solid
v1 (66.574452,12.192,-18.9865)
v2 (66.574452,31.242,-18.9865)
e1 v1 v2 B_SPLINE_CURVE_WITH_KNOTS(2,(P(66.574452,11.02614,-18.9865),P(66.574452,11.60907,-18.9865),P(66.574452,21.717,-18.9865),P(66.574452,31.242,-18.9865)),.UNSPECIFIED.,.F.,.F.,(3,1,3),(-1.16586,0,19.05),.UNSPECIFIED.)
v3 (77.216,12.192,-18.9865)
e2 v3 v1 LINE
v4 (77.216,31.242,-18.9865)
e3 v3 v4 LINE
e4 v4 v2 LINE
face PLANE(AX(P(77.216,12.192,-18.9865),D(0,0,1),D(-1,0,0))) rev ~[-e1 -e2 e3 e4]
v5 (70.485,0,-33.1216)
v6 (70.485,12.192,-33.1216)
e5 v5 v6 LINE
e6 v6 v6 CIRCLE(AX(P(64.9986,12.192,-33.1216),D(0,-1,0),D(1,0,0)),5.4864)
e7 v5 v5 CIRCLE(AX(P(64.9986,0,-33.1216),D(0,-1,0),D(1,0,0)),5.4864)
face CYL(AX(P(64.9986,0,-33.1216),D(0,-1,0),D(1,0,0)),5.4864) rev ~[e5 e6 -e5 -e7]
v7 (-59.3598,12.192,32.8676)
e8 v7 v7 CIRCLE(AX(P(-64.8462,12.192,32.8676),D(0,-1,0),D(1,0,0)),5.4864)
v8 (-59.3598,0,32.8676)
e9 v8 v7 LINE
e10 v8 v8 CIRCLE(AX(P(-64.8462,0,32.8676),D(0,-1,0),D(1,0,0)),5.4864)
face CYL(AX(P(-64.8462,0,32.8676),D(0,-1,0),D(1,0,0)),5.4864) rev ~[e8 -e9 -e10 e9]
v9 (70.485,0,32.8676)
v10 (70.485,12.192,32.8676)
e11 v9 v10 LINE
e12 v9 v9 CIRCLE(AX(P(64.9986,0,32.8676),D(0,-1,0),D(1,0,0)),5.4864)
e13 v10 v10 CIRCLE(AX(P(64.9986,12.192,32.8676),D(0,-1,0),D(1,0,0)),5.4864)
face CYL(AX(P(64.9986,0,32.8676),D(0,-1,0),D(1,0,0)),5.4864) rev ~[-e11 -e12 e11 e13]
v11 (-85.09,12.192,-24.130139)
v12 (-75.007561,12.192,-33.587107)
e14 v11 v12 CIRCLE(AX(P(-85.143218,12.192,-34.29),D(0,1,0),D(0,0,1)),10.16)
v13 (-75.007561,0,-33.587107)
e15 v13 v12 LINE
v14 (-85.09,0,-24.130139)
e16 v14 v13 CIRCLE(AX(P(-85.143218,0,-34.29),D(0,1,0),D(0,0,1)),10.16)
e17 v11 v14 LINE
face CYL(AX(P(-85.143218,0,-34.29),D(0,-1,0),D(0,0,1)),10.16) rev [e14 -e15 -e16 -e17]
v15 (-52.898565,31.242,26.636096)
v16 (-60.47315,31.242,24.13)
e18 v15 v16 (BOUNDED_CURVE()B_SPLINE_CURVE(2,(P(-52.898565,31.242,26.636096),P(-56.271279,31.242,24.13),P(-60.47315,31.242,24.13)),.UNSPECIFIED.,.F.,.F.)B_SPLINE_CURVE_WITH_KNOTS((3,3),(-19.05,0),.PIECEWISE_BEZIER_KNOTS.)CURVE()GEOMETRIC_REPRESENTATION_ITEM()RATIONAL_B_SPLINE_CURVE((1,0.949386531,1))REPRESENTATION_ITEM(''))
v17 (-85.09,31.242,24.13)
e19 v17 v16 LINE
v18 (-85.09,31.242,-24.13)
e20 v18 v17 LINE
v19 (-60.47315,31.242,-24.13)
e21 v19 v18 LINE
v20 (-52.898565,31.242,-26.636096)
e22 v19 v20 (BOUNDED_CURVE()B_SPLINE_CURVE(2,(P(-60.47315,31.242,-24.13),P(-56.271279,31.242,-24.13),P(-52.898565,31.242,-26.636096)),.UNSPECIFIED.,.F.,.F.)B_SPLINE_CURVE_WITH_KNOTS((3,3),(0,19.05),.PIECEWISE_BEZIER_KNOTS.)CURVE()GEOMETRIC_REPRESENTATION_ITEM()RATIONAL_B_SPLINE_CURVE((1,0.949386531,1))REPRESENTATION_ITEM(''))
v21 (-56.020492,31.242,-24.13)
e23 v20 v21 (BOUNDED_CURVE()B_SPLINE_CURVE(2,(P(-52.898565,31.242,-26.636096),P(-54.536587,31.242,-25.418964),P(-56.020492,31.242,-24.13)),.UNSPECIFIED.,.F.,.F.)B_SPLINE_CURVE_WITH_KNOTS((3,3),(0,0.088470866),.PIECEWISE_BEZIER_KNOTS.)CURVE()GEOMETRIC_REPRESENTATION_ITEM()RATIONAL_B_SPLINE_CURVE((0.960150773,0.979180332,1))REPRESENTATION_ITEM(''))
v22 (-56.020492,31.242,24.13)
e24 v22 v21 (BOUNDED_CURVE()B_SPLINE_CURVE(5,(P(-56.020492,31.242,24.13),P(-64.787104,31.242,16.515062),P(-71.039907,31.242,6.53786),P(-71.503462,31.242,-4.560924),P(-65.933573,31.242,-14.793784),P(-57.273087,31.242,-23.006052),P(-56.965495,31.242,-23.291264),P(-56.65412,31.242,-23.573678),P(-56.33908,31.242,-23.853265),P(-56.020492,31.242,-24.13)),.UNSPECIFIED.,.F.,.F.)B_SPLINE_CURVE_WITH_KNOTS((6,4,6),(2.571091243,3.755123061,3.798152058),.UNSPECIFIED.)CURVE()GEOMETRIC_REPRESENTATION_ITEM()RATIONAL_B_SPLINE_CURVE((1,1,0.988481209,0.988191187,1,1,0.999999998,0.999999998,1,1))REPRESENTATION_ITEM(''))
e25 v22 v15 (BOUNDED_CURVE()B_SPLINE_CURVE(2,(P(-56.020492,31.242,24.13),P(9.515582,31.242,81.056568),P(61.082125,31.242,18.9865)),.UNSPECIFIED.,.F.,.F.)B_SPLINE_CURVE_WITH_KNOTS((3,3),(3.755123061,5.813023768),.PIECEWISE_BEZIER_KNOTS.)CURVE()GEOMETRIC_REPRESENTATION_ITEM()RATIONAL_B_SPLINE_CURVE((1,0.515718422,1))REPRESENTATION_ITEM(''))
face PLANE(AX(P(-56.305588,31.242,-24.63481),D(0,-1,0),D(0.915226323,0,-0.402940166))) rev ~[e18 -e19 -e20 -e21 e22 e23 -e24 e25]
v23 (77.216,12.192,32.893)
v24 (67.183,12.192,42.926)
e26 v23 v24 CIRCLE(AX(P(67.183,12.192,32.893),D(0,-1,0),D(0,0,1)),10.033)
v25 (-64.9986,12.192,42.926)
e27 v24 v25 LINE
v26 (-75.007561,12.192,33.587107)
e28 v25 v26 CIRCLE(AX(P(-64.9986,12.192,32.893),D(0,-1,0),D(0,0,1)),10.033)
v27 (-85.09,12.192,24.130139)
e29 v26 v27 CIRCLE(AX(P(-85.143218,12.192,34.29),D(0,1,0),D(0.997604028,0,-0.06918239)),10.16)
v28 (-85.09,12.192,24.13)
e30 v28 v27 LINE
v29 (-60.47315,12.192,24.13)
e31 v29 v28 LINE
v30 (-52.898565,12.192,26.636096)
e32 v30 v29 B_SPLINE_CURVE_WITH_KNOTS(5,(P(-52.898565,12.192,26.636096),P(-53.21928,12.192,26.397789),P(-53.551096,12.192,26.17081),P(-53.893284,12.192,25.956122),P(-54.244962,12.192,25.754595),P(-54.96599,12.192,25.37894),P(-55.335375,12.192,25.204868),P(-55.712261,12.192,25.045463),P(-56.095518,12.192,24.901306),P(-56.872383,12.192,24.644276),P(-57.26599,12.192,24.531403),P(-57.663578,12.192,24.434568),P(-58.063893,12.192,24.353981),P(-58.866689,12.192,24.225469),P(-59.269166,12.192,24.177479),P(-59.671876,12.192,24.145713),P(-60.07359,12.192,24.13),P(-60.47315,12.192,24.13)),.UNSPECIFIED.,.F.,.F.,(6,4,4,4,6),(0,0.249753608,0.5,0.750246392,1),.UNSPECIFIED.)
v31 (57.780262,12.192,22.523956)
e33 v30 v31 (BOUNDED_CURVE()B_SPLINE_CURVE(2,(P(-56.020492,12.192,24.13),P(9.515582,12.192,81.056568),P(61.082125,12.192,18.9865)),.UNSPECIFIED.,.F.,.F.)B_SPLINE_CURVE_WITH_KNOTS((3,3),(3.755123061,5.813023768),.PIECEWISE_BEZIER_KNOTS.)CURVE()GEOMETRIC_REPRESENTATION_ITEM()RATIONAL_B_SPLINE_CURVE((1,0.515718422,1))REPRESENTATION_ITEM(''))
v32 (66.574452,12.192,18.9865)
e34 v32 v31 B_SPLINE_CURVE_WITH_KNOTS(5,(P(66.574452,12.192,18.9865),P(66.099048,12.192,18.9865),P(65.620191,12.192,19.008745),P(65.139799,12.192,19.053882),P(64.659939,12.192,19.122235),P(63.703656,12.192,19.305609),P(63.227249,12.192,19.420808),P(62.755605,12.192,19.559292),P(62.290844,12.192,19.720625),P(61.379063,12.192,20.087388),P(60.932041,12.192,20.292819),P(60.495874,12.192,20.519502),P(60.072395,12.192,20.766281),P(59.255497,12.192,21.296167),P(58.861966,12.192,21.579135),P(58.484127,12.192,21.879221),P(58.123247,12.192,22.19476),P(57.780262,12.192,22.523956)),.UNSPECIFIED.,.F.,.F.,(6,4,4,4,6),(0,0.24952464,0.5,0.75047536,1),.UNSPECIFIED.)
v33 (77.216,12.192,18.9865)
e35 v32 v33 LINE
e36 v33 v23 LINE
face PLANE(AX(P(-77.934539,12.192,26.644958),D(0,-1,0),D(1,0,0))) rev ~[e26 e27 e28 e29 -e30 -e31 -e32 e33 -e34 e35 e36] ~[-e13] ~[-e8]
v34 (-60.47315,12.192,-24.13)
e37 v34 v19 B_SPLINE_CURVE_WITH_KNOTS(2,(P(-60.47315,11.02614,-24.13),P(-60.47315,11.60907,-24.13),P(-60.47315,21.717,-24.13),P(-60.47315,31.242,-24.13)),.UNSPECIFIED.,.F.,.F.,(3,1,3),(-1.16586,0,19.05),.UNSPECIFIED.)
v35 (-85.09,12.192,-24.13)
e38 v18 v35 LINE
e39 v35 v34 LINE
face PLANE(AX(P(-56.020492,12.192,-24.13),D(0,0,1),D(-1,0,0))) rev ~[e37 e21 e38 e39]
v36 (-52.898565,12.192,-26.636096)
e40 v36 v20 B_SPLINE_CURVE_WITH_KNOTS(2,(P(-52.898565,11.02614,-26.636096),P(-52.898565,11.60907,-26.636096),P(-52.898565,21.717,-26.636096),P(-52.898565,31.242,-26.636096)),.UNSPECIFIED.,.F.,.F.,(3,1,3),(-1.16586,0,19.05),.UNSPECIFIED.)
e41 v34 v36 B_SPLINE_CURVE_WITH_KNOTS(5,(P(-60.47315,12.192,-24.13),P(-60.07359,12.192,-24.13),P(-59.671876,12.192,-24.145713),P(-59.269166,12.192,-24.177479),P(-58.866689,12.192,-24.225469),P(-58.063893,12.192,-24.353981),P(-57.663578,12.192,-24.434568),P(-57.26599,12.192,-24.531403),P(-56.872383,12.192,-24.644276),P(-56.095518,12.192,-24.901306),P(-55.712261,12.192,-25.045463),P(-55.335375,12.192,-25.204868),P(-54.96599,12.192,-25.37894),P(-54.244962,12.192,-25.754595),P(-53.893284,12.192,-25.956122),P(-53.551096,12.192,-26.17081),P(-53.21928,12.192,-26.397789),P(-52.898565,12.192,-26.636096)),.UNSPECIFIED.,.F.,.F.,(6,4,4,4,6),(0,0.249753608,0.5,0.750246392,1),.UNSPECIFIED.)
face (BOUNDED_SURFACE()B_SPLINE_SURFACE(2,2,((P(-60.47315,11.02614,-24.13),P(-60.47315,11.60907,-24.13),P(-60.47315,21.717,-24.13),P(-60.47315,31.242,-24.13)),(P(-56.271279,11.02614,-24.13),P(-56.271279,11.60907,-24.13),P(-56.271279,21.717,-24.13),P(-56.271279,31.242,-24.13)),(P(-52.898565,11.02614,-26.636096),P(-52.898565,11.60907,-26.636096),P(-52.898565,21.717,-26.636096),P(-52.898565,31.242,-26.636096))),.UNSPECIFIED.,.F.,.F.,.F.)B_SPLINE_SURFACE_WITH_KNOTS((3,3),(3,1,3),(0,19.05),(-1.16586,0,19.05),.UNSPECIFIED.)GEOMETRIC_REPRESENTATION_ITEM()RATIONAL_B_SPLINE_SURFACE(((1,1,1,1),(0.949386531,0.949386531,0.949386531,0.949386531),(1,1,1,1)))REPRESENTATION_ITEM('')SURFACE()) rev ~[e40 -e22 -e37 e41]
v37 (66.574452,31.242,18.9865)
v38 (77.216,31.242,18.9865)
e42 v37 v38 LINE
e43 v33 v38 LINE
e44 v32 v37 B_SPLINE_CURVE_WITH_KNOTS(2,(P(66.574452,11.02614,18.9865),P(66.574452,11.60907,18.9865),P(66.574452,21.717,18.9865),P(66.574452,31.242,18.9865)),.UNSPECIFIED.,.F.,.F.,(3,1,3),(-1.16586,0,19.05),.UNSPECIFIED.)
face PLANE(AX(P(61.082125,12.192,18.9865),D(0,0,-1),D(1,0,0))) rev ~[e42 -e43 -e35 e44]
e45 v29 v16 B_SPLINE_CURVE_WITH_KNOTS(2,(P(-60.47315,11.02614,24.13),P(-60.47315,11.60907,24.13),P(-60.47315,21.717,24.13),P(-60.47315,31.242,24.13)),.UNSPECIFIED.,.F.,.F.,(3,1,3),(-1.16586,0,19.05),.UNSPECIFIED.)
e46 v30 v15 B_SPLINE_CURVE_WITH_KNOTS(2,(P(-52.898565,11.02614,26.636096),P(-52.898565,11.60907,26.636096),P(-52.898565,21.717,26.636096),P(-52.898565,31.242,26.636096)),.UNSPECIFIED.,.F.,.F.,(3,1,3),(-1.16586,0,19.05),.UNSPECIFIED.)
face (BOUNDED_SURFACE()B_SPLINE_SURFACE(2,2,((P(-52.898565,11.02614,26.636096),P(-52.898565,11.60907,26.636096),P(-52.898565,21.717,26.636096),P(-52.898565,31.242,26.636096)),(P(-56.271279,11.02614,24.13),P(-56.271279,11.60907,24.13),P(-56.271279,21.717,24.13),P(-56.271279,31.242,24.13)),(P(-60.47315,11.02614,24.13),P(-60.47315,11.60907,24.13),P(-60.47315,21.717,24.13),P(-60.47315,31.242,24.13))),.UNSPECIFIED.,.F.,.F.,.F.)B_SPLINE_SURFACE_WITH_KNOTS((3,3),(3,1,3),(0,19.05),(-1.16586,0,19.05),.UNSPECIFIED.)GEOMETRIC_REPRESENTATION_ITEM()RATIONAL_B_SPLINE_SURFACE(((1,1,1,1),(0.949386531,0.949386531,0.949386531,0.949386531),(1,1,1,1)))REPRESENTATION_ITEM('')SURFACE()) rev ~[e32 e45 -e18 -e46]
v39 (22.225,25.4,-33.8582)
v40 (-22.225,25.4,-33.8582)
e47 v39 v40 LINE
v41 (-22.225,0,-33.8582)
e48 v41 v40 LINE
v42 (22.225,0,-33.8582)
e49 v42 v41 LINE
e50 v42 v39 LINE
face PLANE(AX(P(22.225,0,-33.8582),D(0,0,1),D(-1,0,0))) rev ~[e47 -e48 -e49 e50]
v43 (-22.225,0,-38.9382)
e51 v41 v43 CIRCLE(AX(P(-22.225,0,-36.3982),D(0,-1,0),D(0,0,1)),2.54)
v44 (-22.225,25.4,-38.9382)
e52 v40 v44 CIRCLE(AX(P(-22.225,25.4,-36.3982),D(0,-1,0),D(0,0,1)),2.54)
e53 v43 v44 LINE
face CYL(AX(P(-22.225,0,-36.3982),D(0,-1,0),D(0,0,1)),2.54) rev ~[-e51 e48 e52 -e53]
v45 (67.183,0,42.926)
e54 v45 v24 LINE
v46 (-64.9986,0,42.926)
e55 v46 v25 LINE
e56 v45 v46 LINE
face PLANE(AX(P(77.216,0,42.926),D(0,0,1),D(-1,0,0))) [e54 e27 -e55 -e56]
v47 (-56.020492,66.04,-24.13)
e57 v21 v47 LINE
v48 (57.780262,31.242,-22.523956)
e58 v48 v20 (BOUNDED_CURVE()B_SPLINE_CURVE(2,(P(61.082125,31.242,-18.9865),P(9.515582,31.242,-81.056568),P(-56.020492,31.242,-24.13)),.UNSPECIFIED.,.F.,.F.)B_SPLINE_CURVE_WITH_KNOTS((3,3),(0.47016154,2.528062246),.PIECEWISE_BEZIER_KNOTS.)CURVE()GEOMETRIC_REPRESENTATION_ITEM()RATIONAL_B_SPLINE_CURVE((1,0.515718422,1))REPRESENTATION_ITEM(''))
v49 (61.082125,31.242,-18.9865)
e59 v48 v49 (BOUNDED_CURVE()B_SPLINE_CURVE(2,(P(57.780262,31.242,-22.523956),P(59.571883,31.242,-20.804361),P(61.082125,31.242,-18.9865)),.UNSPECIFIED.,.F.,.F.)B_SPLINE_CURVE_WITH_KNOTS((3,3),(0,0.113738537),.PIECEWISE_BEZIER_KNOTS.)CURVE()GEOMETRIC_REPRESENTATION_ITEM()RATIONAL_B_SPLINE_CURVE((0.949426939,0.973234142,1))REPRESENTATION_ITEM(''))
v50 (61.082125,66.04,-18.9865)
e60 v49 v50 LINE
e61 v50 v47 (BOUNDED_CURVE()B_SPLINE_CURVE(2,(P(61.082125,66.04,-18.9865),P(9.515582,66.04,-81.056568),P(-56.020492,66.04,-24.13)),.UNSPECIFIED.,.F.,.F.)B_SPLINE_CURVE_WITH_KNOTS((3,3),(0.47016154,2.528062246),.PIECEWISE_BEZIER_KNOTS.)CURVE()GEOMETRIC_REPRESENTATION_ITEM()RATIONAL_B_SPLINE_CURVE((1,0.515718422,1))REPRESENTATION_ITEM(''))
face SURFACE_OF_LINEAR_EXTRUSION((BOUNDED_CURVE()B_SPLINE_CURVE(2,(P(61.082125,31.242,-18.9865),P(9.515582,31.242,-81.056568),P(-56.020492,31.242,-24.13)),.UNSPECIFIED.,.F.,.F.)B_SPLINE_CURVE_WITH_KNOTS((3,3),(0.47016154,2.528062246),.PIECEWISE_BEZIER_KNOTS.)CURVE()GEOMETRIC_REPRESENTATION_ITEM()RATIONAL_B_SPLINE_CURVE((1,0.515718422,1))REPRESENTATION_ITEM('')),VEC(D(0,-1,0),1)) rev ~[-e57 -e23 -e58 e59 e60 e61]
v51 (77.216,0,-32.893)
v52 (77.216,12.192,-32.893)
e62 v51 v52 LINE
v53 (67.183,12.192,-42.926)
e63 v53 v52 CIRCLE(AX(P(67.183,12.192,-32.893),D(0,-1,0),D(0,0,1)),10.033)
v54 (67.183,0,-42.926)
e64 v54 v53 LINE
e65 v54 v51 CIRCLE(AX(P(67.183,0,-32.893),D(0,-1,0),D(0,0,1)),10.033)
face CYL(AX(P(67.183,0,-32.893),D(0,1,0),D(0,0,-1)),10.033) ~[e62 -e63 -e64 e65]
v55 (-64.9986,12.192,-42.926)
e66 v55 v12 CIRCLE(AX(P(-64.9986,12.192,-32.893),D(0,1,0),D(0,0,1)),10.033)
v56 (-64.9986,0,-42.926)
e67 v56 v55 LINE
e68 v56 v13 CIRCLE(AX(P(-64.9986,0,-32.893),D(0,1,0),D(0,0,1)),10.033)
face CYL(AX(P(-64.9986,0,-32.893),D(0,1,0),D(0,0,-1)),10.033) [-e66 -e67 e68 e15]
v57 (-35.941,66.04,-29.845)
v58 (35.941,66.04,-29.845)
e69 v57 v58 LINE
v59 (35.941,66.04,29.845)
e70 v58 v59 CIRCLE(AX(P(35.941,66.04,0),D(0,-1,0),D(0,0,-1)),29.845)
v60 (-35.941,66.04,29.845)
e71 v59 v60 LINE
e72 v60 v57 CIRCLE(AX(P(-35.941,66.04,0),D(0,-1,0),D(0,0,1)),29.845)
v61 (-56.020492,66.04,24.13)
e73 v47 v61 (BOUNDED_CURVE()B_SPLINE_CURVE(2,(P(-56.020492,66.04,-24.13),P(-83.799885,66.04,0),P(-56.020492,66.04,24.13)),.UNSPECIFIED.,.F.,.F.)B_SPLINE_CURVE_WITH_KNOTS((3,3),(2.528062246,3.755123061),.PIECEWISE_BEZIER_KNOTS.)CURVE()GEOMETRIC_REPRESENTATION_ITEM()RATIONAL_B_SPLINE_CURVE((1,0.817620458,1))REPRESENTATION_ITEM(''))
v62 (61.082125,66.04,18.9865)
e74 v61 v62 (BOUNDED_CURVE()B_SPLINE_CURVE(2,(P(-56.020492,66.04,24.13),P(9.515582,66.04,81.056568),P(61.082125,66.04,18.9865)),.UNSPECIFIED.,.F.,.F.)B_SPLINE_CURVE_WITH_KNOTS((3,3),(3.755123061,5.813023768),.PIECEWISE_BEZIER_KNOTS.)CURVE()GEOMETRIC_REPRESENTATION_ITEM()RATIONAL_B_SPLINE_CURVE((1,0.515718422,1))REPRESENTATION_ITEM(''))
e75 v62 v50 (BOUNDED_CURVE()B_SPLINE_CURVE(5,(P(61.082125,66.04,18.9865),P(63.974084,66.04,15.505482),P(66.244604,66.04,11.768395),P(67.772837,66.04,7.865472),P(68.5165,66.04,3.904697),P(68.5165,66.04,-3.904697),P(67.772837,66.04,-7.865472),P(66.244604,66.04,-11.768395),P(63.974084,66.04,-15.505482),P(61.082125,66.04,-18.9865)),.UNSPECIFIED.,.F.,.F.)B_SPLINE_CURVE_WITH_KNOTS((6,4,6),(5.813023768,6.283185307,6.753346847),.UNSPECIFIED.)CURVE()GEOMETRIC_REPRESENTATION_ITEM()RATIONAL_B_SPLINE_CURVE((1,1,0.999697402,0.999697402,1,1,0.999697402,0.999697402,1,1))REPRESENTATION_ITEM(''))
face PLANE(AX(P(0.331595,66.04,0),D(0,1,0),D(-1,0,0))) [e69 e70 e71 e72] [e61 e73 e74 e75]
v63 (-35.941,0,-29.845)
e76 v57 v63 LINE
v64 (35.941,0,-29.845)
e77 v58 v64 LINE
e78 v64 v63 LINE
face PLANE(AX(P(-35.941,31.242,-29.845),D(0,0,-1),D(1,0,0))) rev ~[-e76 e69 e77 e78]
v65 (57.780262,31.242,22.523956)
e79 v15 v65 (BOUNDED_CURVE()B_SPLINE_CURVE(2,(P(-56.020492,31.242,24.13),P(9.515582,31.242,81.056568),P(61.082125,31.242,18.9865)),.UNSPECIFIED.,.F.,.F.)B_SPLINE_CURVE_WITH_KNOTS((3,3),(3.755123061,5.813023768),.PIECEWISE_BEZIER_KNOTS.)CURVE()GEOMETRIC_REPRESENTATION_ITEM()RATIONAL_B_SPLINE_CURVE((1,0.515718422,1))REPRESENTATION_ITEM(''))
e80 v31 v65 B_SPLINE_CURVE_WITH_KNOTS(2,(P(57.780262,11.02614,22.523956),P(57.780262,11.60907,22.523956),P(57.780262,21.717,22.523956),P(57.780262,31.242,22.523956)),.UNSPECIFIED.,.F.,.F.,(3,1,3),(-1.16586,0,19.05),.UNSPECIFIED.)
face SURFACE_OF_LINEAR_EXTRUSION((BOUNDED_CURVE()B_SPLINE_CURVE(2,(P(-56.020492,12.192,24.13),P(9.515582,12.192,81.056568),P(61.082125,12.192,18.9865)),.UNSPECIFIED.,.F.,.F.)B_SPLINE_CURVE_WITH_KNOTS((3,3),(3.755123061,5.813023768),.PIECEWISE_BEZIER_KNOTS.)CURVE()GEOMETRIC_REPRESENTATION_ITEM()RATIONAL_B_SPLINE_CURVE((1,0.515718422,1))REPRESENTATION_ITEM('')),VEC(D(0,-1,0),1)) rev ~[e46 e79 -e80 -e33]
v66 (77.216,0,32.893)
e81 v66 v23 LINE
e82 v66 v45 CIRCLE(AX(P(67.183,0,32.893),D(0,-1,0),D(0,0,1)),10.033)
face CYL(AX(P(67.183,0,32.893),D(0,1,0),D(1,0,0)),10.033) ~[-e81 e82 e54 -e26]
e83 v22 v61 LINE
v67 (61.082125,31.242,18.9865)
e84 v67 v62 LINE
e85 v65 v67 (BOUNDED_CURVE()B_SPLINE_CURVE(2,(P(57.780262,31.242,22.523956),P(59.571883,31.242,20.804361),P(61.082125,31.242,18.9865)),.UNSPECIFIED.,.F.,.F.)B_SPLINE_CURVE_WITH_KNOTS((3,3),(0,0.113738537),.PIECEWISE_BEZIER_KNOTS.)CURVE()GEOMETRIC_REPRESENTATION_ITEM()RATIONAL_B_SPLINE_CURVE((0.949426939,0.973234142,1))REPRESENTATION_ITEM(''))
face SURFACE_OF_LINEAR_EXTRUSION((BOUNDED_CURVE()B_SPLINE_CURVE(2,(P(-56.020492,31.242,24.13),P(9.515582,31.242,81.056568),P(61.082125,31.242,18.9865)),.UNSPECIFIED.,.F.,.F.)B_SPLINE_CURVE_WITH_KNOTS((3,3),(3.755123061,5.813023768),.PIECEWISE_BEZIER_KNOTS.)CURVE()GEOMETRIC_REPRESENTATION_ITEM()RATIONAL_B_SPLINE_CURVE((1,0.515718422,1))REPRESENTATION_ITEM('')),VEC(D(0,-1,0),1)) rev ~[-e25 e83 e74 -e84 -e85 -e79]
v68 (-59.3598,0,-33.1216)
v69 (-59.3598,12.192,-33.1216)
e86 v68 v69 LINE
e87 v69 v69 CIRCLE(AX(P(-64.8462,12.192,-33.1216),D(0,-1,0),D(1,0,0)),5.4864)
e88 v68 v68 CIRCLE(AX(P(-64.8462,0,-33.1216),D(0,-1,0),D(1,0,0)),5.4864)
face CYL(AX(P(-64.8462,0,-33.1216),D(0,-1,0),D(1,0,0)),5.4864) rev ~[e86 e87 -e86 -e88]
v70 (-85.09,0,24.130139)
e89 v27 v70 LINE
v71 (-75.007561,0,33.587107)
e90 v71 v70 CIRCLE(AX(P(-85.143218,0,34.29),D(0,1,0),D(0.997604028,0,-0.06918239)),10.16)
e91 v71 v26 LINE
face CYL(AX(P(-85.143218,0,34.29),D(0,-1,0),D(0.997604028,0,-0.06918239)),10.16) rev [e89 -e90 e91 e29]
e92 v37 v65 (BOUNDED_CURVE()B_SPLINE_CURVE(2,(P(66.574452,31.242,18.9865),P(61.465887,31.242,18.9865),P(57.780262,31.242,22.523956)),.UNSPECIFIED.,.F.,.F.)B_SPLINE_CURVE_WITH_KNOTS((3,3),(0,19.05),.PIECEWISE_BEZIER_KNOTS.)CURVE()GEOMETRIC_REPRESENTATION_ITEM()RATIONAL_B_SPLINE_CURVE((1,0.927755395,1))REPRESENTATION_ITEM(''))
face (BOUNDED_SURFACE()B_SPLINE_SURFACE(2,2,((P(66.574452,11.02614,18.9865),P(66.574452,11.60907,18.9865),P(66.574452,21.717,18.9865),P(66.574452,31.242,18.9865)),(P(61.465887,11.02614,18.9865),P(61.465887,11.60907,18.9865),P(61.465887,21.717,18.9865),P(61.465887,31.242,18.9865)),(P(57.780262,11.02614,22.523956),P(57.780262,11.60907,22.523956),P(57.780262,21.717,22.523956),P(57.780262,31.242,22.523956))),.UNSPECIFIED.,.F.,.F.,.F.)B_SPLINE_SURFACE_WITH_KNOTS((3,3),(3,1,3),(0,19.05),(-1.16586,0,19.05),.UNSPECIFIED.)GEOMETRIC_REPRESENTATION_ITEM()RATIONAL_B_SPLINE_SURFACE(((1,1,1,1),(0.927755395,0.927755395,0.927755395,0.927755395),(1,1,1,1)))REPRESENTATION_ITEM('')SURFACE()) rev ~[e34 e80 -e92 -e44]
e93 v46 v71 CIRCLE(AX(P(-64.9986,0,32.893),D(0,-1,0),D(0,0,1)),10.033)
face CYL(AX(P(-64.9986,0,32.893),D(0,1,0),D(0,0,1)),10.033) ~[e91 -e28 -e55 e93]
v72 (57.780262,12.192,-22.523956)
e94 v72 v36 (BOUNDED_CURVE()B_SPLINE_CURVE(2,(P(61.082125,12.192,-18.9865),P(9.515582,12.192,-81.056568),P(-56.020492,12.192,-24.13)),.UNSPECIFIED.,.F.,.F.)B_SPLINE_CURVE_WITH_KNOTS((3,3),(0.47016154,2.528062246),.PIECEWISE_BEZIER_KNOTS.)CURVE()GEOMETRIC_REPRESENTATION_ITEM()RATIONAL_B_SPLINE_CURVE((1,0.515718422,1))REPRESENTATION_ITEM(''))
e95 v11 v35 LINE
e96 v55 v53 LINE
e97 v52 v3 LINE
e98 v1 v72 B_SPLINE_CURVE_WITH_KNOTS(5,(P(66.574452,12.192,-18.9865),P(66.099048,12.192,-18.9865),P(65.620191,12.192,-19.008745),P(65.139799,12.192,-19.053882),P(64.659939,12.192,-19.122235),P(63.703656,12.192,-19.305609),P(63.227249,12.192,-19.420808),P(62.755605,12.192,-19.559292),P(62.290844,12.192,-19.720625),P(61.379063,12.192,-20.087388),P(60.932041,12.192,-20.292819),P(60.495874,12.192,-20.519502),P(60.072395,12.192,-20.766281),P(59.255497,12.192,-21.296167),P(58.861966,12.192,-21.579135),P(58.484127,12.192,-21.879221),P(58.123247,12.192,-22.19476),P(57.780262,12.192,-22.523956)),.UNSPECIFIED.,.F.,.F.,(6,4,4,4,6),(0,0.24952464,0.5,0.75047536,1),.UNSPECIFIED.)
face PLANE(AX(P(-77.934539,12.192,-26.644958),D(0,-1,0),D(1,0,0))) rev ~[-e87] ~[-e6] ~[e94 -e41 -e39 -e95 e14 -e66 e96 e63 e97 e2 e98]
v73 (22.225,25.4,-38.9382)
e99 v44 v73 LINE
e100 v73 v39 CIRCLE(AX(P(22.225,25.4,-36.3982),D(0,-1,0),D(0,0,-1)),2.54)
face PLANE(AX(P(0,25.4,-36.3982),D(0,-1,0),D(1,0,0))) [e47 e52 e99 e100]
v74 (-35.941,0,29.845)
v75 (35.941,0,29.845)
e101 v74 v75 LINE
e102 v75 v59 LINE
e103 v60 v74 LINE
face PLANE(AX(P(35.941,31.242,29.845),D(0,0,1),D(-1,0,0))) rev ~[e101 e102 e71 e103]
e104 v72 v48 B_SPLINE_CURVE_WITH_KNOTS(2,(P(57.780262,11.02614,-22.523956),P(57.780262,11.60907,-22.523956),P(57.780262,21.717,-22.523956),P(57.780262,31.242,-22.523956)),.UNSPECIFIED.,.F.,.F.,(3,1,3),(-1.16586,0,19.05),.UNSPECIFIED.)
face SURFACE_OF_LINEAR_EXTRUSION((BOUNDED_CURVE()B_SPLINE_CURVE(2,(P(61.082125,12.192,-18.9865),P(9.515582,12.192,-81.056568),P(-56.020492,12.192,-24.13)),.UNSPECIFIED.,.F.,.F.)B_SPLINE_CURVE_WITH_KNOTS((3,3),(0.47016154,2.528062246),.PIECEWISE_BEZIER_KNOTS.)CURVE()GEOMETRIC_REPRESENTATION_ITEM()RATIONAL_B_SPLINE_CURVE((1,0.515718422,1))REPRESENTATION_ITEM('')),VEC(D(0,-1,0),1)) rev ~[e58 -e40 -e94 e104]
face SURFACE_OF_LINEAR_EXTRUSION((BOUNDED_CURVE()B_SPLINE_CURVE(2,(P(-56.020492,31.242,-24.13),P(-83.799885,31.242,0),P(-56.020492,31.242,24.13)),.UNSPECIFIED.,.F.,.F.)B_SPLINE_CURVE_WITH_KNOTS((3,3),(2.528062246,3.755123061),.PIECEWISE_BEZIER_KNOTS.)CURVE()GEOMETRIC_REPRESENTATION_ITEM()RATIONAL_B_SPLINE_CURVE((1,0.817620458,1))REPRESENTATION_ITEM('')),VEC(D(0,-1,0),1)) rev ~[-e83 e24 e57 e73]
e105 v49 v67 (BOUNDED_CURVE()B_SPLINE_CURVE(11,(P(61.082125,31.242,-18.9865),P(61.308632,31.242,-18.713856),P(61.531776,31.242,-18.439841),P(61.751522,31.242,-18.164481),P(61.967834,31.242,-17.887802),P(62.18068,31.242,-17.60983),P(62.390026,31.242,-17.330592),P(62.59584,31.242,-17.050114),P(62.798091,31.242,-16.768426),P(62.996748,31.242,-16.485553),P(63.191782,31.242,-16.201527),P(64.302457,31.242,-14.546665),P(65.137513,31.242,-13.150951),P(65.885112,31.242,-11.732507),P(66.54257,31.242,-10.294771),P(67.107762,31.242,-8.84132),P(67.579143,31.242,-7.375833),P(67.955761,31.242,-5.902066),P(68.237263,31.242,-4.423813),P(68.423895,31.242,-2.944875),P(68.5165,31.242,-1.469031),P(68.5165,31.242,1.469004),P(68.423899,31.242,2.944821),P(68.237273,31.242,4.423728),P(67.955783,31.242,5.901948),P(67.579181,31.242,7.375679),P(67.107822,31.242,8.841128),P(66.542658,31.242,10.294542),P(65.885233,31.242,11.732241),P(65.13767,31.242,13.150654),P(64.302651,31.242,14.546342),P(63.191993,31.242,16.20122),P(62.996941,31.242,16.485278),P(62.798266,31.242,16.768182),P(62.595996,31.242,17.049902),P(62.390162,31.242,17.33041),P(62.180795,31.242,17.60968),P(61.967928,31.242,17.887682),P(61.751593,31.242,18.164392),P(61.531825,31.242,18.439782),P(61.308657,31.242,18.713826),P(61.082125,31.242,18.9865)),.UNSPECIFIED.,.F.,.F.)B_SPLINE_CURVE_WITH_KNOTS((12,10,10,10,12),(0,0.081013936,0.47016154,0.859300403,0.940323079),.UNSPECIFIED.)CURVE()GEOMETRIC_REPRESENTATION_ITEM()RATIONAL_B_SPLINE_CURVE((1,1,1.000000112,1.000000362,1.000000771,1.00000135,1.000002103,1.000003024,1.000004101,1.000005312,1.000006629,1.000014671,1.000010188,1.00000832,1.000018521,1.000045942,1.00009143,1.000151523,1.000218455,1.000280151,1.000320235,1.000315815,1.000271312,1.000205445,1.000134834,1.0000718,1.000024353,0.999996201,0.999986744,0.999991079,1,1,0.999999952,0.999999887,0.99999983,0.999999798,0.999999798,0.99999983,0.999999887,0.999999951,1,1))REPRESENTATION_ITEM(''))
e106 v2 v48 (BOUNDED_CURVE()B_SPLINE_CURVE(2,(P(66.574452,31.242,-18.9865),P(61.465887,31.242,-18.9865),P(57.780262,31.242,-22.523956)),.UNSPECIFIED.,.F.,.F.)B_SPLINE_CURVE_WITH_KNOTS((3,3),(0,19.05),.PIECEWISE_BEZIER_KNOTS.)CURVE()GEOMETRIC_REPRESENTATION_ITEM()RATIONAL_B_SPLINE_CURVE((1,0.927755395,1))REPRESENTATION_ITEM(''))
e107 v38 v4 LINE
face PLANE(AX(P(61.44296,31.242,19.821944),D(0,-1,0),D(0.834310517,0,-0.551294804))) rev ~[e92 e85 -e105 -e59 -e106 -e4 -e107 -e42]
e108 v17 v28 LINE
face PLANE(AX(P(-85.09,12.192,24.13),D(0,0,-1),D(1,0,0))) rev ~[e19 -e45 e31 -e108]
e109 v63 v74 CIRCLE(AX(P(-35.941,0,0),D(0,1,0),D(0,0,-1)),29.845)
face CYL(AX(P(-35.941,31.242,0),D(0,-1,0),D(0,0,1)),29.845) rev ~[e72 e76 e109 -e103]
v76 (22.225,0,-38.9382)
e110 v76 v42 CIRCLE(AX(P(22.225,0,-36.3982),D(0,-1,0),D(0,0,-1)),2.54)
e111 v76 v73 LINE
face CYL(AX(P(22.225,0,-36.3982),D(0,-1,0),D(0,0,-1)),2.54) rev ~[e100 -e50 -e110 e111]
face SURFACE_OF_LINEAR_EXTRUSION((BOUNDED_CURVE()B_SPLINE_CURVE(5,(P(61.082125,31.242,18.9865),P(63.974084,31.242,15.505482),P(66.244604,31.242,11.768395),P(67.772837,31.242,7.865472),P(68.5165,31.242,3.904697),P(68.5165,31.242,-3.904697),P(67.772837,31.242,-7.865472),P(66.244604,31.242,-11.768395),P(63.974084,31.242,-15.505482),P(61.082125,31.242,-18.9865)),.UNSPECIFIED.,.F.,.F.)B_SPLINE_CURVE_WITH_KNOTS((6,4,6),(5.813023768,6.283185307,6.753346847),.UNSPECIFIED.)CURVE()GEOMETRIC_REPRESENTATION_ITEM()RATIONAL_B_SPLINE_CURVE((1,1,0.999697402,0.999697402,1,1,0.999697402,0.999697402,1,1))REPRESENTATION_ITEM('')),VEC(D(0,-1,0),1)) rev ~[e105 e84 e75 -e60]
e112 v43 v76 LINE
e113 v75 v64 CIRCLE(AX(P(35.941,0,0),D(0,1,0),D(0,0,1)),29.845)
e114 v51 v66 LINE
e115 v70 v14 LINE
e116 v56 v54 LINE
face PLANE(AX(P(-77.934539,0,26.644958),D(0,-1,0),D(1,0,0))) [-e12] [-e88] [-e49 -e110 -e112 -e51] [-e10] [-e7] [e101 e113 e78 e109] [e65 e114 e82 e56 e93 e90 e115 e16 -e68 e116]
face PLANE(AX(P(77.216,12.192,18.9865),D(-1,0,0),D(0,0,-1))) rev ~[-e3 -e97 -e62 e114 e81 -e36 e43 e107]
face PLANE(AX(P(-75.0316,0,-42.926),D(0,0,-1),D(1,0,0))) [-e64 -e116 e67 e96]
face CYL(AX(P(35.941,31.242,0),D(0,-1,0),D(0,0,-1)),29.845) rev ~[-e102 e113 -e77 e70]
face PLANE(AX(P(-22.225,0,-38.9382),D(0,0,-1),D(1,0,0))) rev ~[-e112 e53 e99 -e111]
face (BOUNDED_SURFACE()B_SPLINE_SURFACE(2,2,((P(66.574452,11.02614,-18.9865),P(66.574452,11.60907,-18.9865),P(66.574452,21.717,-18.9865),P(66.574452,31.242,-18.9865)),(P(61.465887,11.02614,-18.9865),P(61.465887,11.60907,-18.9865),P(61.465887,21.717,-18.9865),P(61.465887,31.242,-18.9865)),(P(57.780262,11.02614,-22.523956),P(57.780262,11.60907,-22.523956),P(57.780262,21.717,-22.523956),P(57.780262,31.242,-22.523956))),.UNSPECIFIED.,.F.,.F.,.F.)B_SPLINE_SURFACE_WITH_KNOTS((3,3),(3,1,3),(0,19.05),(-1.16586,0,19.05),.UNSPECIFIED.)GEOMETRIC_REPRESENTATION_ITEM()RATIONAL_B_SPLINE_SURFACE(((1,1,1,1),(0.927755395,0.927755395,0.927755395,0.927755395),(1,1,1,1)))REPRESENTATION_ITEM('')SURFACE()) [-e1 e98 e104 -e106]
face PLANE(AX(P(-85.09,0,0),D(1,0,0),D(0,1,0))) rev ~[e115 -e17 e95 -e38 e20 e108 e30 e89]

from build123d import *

# Parameters (mm, degrees)
F0_R        = 5.4864
F1_DEPTH    = 12.192
F3_DEPTH    = 19.05
F5_DEPTH    = 34.798
F6_R        = 10.033
F7_T4_DEPTH = 12.192
F7_T9_DEPTH = 12.192
F8_R        = 12.7
F10_DEPTH   = 25.4


# Not quite as in the source:
# - a fillet or chamfer that OpenCascade refuses, or shapes differently, is made with other operations: its cross-section is extruded or revolved along the edge and cut away or added


with BuildPart() as f1:
    # F0 (on Front) → F1 (new body)
    with BuildSketch(Plane.XZ):
        Polygon((-75.0316, 24.13), (-85.09, 24.13), (-85.09, -24.13), (-75.0316, -24.13), (-75.0316, -42.926), (77.216, -42.926), (77.216, 42.926), (-75.0316, 42.926), align=None)
        with Locations((-64.8462, -33.1216)):
            Circle(F0_R, mode=Mode.SUBTRACT)
        with Locations((64.9986, -33.1216)):
            Circle(F0_R, mode=Mode.SUBTRACT)
        with Locations((-64.8462, 32.8676)):
            Circle(F0_R, mode=Mode.SUBTRACT)
        with BuildLine():
            Line((35.941, -29.845), (-35.941, -29.845))
            ThreePointArc((-35.941, -29.845), (-65.786, 0), (-35.941, 29.845))
            Line((-35.941, 29.845), (35.941, 29.845))
            ThreePointArc((35.941, 29.845), (65.786, 0), (35.941, -29.845))
        make_face(mode=Mode.SUBTRACT)
        with Locations((64.9986, 32.8676)):
            Circle(F0_R, mode=Mode.SUBTRACT)
    extrude(amount=-F1_DEPTH)

    # F2 (on face) → F3 (join)
    with BuildSketch(Plane(origin=(0, 12.192, 0), x_dir=(-1, 0, 0), z_dir=(0, 1, 0))):
        with BuildLine():
            add(Edge.make_bspline(
                [(-61.0821252186, 18.9865), (-68.5165, 10.0378265977), (-68.5165, 0)],
                knots=[5.8130237676, 5.8130237676, 5.8130237676, 6.2831853072, 6.2831853072, 6.2831853072], degree=2, weights=[1, 0.9724955315, 1]))
            add(Edge.make_bspline(
                [(-68.5165, 0), (-68.5165, -10.0378265977), (-61.0821252186, -18.9865)],
                knots=[0, 0, 0, 0.4701615396, 0.4701615396, 0.4701615396], degree=2, weights=[1, 0.9724955315, 1]))
            add(Edge.make_bspline(
                [(-61.0821252186, -18.9865), (-9.5155823774, -81.056568289), (56.0204921364, -24.13)],
                knots=[0.4701615396, 0.4701615396, 0.4701615396, 2.5280622458, 2.5280622458, 2.5280622458], degree=2, weights=[1, 0.5157184224, 1]))
            add(Edge.make_bspline(
                [(56.0204921364, -24.13), (83.7998845283, 0), (56.0204921364, 24.13)],
                knots=[2.5280622458, 2.5280622458, 2.5280622458, 3.7551230613, 3.7551230613, 3.7551230613], degree=2, weights=[1, 0.8176204584, 1]))
            add(Edge.make_bspline(
                [(56.0204921364, 24.13), (-9.5155823774, 81.056568289), (-61.0821252186, 18.9865)],
                knots=[3.7551230613, 3.7551230613, 3.7551230613, 5.8130237676, 5.8130237676, 5.8130237676], degree=2, weights=[1, 0.5157184224, 1]))
        make_face()
        with BuildLine():
            ThreePointArc((35.941, 29.845), (65.786, 0), (35.941, -29.845))
            Line((35.941, -29.845), (-35.941, -29.845))
            ThreePointArc((-35.941, -29.845), (-65.786, 0), (-35.941, 29.845))
            Line((-35.941, 29.845), (35.941, 29.845))
        make_face(mode=Mode.SUBTRACT)
        with BuildLine():
            add(Edge.make_bspline(
                [(-68.5165, 0), (-68.5165, -10.0378265977), (-61.0821252186, -18.9865)],
                knots=[0, 0, 0, 0.4701615396, 0.4701615396, 0.4701615396], degree=2, weights=[1, 0.9724955315, 1]))
            add(Edge.make_bspline(
                [(-61.0821252186, 18.9865), (-68.5165, 10.0378265977), (-68.5165, 0)],
                knots=[5.8130237676, 5.8130237676, 5.8130237676, 6.2831853072, 6.2831853072, 6.2831853072], degree=2, weights=[1, 0.9724955315, 1]))
            Line((-61.0821252186, 18.9865), (-77.216, 18.9865))
            Line((-77.216, 18.9865), (-77.216, -18.9865))
            Line((-77.216, -18.9865), (-61.0821252186, -18.9865))
        make_face()
        with BuildLine():
            add(Edge.make_bspline(
                [(56.0204921364, -24.13), (83.7998845283, 0), (56.0204921364, 24.13)],
                knots=[2.5280622458, 2.5280622458, 2.5280622458, 3.7551230613, 3.7551230613, 3.7551230613], degree=2, weights=[1, 0.8176204584, 1]))
            Line((56.0204921364, -24.13), (85.09, -24.13))
            Line((85.09, -24.13), (85.09, 24.13))
            Line((85.09, 24.13), (56.0204921364, 24.13))
        make_face()
    extrude(amount=F3_DEPTH)

    # F4 (on face) → F5 (join)
    with BuildSketch(Plane(origin=(0, 31.242, 0), x_dir=(-1, 0, 0), z_dir=(0, 1, 0))):
        with BuildLine():
            add(Edge.make_bspline(
                [(-61.0821252186, 18.9865), (-68.5165, 10.0378265977), (-68.5165, 0)],
                knots=[5.8130237676, 5.8130237676, 5.8130237676, 6.2831853072, 6.2831853072, 6.2831853072], degree=2, weights=[1, 0.9724955315, 1]))
            add(Edge.make_bspline(
                [(-68.5165, 0), (-68.5165, -10.0378265977), (-61.0821252186, -18.9865)],
                knots=[0, 0, 0, 0.4701615396, 0.4701615396, 0.4701615396], degree=2, weights=[1, 0.9724955315, 1]))
            add(Edge.make_bspline(
                [(-61.0821252186, -18.9865), (-9.5155823774, -81.056568289), (56.0204921364, -24.13)],
                knots=[0.4701615396, 0.4701615396, 0.4701615396, 2.5280622458, 2.5280622458, 2.5280622458], degree=2, weights=[1, 0.5157184224, 1]))
            add(Edge.make_bspline(
                [(56.0204921364, -24.13), (83.7998845283, 0), (56.0204921364, 24.13)],
                knots=[2.5280622458, 2.5280622458, 2.5280622458, 3.7551230613, 3.7551230613, 3.7551230613], degree=2, weights=[1, 0.8176204584, 1]))
            add(Edge.make_bspline(
                [(56.0204921364, 24.13), (-9.5155823774, 81.056568289), (-61.0821252186, 18.9865)],
                knots=[3.7551230613, 3.7551230613, 3.7551230613, 5.8130237676, 5.8130237676, 5.8130237676], degree=2, weights=[1, 0.5157184224, 1]))
        make_face()
        with BuildLine():
            Line((-35.941, 29.845), (35.941, 29.845))
            ThreePointArc((35.941, 29.845), (65.786, 0), (35.941, -29.845))
            Line((35.941, -29.845), (-35.941, -29.845))
            ThreePointArc((-35.941, -29.845), (-65.786, 0), (-35.941, 29.845))
        make_face(mode=Mode.SUBTRACT)
    extrude(amount=F5_DEPTH)

    # F6
    f6_edges = [f1.edges().sort_by_distance(p)[0] for p in [
        (-75.0316, 6.096, 42.926),
        (77.216, 6.096, 42.926),
        (77.216, 6.096, -42.926),
        (-75.0316, 6.096, -42.926),
    ]]
    fillet(f6_edges, radius=F6_R)

    # F7: fillet of radius 10.16 on 2 edges, made by hand


with BuildPart() as f7_tool2:
    # F7_s3 → F7_t4 (new body)
    with BuildSketch(Plane.XZ):
        with BuildLine():
            ThreePointArc((-85.1432181398, -24.13), (-78.2119770428, -26.8614404589), (-75.0075612141, -33.5871069182))
            Line((-75.0075612141, -33.5871069182), (-73.9939955216, -33.5168176101))
            ThreePointArc((-73.9939955216, -33.5168176101), (-74.0156, -32.893), (-74.0156, -24.13))
            Line((-74.0156, -24.13), (-75.0316, -23.114))
            Line((-75.0316, -23.114), (-85.1432181398, -23.114))
            Line((-85.1432181398, -23.114), (-85.1432181398, -24.13))
        make_face()
    extrude(amount=-F7_T4_DEPTH)

    split(bisect_by=Plane.YZ.offset(-85.09), keep=Keep.TOP)


with BuildPart() as f1_1:
    add(f1.part)

    # F7_t1: union F7_tool2
    add(f7_tool2.part)


with BuildPart() as f7_tool7:
    # F7_s8 → F7_t9 (new body)
    with BuildSketch(Plane.XZ):
        with BuildLine():
            ThreePointArc((-75.0075612141, 33.5871069182), (-78.2119770428, 26.8614404589), (-85.1432181398, 24.13))
            Line((-85.1432181398, 24.13), (-85.1432181398, 23.114))
            Line((-85.1432181398, 23.114), (-75.0316, 23.114))
            Line((-75.0316, 23.114), (-74.0156, 24.13))
            ThreePointArc((-74.0156, 24.13), (-74.0156, 32.893), (-73.9939955216, 33.5168176101))
            Line((-73.9939955216, 33.5168176101), (-75.0075612141, 33.5871069182))
        make_face()
    extrude(amount=-F7_T9_DEPTH)

    split(bisect_by=Plane.YZ.offset(-85.09), keep=Keep.TOP)


with BuildPart() as f1_2:
    add(f1_1.part)

    # F7_t6: union F7_tool7
    add(f7_tool7.part)

    # F8 (call 1 of 4: OpenCascade refuses the feature's edges together)
    f8_edges = [f1_2.edges().sort_by_distance(p)[0] for p in [
        (-56.020492, 21.717, 24.13),
    ]]
    fillet(f8_edges, radius=F8_R)

    # F8#3 (call 2 of 4)
    f8_3_edges = [f1_2.edges().sort_by_distance(p)[0] for p in [
        (61.082125, 21.717, -18.9865),
    ]]
    fillet(f8_3_edges, radius=F8_R)

    # F8#4 (call 3 of 4)
    f8_4_edges = [f1_2.edges().sort_by_distance(p)[0] for p in [
        (-56.020492, 21.717, -24.13),
    ]]
    fillet(f8_4_edges, radius=F8_R)

    # F8#2 (call 4 of 4)
    f8_2_edges = [f1_2.edges().sort_by_distance(p)[0] for p in [
        (61.082125, 21.717, 18.9865),
    ]]
    fillet(f8_2_edges, radius=F8_R)

    # F9 (on face) → F10 (cut)
    with BuildSketch(Plane.XZ):
        with BuildLine():
            ThreePointArc((22.225, -38.9382), (24.765, -36.3982), (22.225, -33.8582))
            Line((22.225, -33.8582), (-22.225, -33.8582))
            ThreePointArc((-22.225, -33.8582), (-24.765, -36.3982), (-22.225, -38.9382))
            Line((-22.225, -38.9382), (22.225, -38.9382))
        make_face()
    extrude(amount=-F10_DEPTH, mode=Mode.SUBTRACT)


solid = f1_2.part
